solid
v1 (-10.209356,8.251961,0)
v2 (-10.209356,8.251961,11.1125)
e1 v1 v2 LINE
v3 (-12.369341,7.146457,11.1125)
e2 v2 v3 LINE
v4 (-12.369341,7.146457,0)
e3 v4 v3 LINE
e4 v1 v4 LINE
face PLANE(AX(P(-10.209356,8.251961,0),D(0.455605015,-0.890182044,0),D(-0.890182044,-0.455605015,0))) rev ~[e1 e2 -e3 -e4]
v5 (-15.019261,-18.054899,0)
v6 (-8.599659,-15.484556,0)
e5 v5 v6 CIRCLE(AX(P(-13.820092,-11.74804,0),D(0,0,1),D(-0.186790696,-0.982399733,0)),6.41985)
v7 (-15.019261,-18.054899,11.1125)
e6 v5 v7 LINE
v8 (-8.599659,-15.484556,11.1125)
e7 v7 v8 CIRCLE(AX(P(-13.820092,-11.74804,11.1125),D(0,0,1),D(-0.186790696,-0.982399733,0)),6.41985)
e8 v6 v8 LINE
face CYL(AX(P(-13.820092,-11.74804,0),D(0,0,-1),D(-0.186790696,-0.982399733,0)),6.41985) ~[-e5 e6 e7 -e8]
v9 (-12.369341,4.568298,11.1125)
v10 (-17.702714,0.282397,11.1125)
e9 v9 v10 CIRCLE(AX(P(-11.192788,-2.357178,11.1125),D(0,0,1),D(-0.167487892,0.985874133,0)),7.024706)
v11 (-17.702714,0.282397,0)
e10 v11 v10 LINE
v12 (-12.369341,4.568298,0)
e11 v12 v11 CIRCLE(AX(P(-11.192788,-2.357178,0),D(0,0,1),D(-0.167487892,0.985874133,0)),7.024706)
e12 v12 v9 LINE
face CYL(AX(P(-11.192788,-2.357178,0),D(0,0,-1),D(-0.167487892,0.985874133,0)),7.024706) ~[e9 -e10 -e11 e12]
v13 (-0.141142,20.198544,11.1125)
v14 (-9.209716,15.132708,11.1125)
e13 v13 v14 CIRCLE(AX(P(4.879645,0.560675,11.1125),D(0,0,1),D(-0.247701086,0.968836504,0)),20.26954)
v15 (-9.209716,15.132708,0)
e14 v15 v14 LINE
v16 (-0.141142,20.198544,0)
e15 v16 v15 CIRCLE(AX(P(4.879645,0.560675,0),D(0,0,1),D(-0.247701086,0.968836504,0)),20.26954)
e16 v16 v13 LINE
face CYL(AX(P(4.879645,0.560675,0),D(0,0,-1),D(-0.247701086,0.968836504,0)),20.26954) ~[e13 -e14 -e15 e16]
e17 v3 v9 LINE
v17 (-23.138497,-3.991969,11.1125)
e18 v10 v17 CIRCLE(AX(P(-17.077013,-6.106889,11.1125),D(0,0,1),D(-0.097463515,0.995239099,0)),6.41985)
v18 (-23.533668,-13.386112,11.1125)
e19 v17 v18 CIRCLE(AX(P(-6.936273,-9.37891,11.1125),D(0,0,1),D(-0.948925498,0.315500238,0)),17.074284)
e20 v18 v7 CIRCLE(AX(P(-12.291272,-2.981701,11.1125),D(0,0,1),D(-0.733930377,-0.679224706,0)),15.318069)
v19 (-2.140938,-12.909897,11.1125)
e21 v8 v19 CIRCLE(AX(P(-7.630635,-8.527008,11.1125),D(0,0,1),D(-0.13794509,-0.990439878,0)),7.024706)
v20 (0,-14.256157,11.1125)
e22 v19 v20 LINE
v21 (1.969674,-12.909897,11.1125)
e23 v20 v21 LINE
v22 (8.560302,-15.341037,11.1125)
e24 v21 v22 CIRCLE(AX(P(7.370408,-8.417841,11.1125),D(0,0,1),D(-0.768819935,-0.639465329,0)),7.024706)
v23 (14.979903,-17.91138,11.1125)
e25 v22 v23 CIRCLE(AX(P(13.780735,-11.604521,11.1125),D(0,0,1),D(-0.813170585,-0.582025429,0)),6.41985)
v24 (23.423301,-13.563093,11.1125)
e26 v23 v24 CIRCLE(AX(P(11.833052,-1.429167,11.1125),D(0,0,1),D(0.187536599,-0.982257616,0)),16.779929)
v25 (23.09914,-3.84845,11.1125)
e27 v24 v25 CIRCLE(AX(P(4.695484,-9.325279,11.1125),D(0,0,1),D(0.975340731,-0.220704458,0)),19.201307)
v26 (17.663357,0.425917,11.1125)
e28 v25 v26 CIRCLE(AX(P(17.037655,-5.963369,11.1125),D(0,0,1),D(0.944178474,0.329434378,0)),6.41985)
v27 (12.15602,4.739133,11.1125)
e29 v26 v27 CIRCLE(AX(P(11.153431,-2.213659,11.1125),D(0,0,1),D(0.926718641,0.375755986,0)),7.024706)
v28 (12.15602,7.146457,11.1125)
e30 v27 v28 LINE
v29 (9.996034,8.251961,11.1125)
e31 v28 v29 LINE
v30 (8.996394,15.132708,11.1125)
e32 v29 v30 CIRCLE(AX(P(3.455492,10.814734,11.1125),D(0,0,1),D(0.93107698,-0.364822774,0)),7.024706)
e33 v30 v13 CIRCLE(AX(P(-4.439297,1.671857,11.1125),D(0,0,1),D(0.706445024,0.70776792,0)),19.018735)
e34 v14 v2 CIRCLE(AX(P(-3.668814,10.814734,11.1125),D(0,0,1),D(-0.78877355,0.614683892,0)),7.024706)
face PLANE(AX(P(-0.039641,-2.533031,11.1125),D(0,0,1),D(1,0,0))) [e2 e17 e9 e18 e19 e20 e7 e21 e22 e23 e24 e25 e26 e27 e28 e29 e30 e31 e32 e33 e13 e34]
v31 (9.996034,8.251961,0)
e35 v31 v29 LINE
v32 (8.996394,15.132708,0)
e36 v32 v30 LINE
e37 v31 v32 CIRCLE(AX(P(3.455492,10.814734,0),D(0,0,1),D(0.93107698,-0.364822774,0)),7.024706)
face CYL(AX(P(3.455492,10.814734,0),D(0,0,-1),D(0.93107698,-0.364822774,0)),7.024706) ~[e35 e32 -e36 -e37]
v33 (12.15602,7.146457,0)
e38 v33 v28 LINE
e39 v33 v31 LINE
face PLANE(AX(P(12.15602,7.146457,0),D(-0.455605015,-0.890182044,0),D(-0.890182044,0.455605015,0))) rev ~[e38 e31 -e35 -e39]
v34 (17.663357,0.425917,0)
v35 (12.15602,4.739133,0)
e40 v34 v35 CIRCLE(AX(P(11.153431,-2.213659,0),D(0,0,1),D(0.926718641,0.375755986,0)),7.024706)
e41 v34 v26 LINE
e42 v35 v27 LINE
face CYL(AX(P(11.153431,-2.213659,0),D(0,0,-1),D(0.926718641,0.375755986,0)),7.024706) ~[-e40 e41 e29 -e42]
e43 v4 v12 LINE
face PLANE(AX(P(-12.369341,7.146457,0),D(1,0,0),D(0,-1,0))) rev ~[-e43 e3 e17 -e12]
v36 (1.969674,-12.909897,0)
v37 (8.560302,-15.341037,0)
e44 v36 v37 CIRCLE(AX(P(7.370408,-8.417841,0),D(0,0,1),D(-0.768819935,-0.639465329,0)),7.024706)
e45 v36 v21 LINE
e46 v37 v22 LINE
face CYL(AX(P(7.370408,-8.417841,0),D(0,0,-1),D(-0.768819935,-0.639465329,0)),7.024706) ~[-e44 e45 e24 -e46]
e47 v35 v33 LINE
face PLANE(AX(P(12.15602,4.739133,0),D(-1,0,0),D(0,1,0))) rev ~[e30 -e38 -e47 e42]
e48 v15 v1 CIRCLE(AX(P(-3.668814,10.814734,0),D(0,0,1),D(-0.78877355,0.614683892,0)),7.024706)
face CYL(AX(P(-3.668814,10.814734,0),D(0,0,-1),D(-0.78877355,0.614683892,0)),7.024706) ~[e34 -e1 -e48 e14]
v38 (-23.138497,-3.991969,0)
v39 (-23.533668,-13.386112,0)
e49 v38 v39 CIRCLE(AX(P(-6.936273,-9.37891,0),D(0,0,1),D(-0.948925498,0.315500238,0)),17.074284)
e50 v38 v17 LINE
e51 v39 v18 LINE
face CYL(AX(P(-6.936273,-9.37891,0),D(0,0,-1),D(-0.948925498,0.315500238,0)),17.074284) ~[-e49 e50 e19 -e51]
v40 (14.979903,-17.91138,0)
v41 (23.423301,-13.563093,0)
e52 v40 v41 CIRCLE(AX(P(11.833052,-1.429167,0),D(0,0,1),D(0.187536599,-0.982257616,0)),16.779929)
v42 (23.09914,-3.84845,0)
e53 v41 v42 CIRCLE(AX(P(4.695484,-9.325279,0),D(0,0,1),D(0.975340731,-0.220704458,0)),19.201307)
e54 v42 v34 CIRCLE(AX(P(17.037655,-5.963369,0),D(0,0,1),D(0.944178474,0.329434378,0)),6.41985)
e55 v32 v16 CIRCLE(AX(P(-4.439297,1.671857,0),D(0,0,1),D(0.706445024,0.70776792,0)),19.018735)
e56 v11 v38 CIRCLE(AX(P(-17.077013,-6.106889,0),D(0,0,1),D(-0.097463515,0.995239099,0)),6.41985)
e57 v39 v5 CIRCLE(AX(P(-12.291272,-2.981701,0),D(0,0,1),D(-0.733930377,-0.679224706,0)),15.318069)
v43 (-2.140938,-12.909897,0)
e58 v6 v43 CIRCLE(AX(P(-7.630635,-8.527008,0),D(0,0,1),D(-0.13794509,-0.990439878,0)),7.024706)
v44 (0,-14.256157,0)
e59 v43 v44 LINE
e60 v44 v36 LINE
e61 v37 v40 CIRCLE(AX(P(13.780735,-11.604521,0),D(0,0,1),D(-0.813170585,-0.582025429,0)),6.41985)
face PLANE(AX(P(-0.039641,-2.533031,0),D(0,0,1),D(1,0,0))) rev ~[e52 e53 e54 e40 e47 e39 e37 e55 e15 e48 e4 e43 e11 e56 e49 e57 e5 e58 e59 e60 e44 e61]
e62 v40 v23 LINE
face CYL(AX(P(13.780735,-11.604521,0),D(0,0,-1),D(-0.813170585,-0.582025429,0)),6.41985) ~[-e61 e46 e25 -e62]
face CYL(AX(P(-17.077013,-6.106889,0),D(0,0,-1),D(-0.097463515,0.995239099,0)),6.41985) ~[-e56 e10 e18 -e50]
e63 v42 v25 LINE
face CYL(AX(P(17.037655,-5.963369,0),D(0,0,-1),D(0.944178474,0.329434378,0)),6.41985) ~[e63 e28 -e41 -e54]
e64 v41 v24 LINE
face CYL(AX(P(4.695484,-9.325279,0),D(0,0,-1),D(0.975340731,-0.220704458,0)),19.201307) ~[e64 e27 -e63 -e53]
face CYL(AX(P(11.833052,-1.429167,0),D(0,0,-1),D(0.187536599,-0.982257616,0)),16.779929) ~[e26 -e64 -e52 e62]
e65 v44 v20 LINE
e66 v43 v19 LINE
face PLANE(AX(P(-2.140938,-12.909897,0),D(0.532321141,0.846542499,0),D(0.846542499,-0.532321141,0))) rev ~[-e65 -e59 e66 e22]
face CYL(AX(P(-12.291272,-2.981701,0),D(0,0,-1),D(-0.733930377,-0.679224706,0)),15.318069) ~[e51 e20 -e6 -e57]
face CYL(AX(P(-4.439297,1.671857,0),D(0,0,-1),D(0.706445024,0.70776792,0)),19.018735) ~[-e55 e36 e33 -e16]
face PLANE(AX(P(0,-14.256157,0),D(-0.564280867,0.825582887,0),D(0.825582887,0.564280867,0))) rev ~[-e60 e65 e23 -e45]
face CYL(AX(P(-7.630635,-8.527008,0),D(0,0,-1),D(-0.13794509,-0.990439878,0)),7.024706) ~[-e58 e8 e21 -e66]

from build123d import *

# Parameters (mm, degrees)
F1_DEPTH = 11.1125


# Not quite as in the source:
# - a length typed as a fraction of an inch, garbled in the dataset ("3 / 203.2 mm" for 3/8 in), is restored


with BuildPart() as f1:
    # F0 (on Top) → F1 (new body)
    with BuildSketch(Plane.XY):
        with BuildLine():
            ThreePointArc((-0.1411418198, 20.1985444874), (-5.0054503986, 18.2564119782), (-9.2097157612, 15.1327075437))
            ThreePointArc((-9.2097157612, 15.1327075437), (-10.6205392688, 11.8246856933), (-10.2093555033, 8.2519613206))
            Line((-10.2093555033, 8.2519613206), (-12.369341217, 7.1464567445))
            Line((-12.369341217, 7.1464567445), (-12.369341217, 4.6386048198))
            Line((-12.369341217, 4.6386048198), (-12.369341217, 4.5682978211))
            ThreePointArc((-12.369341217, 4.5682978211), (-15.5930977879, 3.1185654947), (-17.7027139134, 0.2823972963))
            ThreePointArc((-17.7027139134, 0.2823972963), (-21.0452825194, -1.0603738309), (-23.1384971151, -3.9919692741))
            ThreePointArc((-23.1384971151, -3.9919692741), (-23.9954710425, -8.6613028545), (-23.5336683691, -13.3861117065))
            ThreePointArc((-23.5336683691, -13.3861117065), (-19.6562098094, -16.4130421994), (-15.0192606046, -18.054899429))
            ThreePointArc((-15.0192606046, -18.054899429), (-11.4338171794, -17.7079201351), (-8.5996589687, -15.484556372))
            ThreePointArc((-8.5996589687, -15.484556372), (-5.0294162563, -15.0523544446), (-2.1409380715, -12.9098966718))
            Line((-2.1409380715, -12.9098966718), (0, -14.2561570176))
            Line((0, -14.2561570176), (1.9696742658, -12.9098966718))
            ThreePointArc((1.9696742658, -12.9098966718), (4.9392756736, -15.0084468105), (8.560301624, -15.3410370587))
            ThreePointArc((8.560301624, -15.3410370587), (11.3944598347, -17.5644008218), (14.9799032599, -17.9113801157))
            ThreePointArc((14.9799032599, -17.9113801157), (19.5156578324, -16.3470620723), (23.423301056, -13.563092798))
            ThreePointArc((23.423301056, -13.563092798), (23.8861103651, -8.6849198531), (23.0991397704, -3.8484499608))
            ThreePointArc((23.0991397704, -3.8484499608), (21.0059251747, -0.9168545176), (17.6633565687, 0.4259166096))
            ThreePointArc((17.6633565687, 0.4259166096), (15.4847616458, 3.3168082822), (12.1560195839, 4.739132713))
            Line((12.1560195839, 4.739132713), (12.1560195839, 7.1464567445))
            Line((12.1560195839, 7.1464567445), (9.9960338703, 8.2519613206))
            ThreePointArc((9.9960338703, 8.2519613206), (10.4072176357, 11.8246856933), (8.9963941282, 15.1327075437))
            ThreePointArc((8.9963941282, 15.1327075437), (4.7823081966, 18.3053860292), (-0.1411418198, 20.1985444874))
        make_face()
    extrude(amount=F1_DEPTH)


solid = f1.part
